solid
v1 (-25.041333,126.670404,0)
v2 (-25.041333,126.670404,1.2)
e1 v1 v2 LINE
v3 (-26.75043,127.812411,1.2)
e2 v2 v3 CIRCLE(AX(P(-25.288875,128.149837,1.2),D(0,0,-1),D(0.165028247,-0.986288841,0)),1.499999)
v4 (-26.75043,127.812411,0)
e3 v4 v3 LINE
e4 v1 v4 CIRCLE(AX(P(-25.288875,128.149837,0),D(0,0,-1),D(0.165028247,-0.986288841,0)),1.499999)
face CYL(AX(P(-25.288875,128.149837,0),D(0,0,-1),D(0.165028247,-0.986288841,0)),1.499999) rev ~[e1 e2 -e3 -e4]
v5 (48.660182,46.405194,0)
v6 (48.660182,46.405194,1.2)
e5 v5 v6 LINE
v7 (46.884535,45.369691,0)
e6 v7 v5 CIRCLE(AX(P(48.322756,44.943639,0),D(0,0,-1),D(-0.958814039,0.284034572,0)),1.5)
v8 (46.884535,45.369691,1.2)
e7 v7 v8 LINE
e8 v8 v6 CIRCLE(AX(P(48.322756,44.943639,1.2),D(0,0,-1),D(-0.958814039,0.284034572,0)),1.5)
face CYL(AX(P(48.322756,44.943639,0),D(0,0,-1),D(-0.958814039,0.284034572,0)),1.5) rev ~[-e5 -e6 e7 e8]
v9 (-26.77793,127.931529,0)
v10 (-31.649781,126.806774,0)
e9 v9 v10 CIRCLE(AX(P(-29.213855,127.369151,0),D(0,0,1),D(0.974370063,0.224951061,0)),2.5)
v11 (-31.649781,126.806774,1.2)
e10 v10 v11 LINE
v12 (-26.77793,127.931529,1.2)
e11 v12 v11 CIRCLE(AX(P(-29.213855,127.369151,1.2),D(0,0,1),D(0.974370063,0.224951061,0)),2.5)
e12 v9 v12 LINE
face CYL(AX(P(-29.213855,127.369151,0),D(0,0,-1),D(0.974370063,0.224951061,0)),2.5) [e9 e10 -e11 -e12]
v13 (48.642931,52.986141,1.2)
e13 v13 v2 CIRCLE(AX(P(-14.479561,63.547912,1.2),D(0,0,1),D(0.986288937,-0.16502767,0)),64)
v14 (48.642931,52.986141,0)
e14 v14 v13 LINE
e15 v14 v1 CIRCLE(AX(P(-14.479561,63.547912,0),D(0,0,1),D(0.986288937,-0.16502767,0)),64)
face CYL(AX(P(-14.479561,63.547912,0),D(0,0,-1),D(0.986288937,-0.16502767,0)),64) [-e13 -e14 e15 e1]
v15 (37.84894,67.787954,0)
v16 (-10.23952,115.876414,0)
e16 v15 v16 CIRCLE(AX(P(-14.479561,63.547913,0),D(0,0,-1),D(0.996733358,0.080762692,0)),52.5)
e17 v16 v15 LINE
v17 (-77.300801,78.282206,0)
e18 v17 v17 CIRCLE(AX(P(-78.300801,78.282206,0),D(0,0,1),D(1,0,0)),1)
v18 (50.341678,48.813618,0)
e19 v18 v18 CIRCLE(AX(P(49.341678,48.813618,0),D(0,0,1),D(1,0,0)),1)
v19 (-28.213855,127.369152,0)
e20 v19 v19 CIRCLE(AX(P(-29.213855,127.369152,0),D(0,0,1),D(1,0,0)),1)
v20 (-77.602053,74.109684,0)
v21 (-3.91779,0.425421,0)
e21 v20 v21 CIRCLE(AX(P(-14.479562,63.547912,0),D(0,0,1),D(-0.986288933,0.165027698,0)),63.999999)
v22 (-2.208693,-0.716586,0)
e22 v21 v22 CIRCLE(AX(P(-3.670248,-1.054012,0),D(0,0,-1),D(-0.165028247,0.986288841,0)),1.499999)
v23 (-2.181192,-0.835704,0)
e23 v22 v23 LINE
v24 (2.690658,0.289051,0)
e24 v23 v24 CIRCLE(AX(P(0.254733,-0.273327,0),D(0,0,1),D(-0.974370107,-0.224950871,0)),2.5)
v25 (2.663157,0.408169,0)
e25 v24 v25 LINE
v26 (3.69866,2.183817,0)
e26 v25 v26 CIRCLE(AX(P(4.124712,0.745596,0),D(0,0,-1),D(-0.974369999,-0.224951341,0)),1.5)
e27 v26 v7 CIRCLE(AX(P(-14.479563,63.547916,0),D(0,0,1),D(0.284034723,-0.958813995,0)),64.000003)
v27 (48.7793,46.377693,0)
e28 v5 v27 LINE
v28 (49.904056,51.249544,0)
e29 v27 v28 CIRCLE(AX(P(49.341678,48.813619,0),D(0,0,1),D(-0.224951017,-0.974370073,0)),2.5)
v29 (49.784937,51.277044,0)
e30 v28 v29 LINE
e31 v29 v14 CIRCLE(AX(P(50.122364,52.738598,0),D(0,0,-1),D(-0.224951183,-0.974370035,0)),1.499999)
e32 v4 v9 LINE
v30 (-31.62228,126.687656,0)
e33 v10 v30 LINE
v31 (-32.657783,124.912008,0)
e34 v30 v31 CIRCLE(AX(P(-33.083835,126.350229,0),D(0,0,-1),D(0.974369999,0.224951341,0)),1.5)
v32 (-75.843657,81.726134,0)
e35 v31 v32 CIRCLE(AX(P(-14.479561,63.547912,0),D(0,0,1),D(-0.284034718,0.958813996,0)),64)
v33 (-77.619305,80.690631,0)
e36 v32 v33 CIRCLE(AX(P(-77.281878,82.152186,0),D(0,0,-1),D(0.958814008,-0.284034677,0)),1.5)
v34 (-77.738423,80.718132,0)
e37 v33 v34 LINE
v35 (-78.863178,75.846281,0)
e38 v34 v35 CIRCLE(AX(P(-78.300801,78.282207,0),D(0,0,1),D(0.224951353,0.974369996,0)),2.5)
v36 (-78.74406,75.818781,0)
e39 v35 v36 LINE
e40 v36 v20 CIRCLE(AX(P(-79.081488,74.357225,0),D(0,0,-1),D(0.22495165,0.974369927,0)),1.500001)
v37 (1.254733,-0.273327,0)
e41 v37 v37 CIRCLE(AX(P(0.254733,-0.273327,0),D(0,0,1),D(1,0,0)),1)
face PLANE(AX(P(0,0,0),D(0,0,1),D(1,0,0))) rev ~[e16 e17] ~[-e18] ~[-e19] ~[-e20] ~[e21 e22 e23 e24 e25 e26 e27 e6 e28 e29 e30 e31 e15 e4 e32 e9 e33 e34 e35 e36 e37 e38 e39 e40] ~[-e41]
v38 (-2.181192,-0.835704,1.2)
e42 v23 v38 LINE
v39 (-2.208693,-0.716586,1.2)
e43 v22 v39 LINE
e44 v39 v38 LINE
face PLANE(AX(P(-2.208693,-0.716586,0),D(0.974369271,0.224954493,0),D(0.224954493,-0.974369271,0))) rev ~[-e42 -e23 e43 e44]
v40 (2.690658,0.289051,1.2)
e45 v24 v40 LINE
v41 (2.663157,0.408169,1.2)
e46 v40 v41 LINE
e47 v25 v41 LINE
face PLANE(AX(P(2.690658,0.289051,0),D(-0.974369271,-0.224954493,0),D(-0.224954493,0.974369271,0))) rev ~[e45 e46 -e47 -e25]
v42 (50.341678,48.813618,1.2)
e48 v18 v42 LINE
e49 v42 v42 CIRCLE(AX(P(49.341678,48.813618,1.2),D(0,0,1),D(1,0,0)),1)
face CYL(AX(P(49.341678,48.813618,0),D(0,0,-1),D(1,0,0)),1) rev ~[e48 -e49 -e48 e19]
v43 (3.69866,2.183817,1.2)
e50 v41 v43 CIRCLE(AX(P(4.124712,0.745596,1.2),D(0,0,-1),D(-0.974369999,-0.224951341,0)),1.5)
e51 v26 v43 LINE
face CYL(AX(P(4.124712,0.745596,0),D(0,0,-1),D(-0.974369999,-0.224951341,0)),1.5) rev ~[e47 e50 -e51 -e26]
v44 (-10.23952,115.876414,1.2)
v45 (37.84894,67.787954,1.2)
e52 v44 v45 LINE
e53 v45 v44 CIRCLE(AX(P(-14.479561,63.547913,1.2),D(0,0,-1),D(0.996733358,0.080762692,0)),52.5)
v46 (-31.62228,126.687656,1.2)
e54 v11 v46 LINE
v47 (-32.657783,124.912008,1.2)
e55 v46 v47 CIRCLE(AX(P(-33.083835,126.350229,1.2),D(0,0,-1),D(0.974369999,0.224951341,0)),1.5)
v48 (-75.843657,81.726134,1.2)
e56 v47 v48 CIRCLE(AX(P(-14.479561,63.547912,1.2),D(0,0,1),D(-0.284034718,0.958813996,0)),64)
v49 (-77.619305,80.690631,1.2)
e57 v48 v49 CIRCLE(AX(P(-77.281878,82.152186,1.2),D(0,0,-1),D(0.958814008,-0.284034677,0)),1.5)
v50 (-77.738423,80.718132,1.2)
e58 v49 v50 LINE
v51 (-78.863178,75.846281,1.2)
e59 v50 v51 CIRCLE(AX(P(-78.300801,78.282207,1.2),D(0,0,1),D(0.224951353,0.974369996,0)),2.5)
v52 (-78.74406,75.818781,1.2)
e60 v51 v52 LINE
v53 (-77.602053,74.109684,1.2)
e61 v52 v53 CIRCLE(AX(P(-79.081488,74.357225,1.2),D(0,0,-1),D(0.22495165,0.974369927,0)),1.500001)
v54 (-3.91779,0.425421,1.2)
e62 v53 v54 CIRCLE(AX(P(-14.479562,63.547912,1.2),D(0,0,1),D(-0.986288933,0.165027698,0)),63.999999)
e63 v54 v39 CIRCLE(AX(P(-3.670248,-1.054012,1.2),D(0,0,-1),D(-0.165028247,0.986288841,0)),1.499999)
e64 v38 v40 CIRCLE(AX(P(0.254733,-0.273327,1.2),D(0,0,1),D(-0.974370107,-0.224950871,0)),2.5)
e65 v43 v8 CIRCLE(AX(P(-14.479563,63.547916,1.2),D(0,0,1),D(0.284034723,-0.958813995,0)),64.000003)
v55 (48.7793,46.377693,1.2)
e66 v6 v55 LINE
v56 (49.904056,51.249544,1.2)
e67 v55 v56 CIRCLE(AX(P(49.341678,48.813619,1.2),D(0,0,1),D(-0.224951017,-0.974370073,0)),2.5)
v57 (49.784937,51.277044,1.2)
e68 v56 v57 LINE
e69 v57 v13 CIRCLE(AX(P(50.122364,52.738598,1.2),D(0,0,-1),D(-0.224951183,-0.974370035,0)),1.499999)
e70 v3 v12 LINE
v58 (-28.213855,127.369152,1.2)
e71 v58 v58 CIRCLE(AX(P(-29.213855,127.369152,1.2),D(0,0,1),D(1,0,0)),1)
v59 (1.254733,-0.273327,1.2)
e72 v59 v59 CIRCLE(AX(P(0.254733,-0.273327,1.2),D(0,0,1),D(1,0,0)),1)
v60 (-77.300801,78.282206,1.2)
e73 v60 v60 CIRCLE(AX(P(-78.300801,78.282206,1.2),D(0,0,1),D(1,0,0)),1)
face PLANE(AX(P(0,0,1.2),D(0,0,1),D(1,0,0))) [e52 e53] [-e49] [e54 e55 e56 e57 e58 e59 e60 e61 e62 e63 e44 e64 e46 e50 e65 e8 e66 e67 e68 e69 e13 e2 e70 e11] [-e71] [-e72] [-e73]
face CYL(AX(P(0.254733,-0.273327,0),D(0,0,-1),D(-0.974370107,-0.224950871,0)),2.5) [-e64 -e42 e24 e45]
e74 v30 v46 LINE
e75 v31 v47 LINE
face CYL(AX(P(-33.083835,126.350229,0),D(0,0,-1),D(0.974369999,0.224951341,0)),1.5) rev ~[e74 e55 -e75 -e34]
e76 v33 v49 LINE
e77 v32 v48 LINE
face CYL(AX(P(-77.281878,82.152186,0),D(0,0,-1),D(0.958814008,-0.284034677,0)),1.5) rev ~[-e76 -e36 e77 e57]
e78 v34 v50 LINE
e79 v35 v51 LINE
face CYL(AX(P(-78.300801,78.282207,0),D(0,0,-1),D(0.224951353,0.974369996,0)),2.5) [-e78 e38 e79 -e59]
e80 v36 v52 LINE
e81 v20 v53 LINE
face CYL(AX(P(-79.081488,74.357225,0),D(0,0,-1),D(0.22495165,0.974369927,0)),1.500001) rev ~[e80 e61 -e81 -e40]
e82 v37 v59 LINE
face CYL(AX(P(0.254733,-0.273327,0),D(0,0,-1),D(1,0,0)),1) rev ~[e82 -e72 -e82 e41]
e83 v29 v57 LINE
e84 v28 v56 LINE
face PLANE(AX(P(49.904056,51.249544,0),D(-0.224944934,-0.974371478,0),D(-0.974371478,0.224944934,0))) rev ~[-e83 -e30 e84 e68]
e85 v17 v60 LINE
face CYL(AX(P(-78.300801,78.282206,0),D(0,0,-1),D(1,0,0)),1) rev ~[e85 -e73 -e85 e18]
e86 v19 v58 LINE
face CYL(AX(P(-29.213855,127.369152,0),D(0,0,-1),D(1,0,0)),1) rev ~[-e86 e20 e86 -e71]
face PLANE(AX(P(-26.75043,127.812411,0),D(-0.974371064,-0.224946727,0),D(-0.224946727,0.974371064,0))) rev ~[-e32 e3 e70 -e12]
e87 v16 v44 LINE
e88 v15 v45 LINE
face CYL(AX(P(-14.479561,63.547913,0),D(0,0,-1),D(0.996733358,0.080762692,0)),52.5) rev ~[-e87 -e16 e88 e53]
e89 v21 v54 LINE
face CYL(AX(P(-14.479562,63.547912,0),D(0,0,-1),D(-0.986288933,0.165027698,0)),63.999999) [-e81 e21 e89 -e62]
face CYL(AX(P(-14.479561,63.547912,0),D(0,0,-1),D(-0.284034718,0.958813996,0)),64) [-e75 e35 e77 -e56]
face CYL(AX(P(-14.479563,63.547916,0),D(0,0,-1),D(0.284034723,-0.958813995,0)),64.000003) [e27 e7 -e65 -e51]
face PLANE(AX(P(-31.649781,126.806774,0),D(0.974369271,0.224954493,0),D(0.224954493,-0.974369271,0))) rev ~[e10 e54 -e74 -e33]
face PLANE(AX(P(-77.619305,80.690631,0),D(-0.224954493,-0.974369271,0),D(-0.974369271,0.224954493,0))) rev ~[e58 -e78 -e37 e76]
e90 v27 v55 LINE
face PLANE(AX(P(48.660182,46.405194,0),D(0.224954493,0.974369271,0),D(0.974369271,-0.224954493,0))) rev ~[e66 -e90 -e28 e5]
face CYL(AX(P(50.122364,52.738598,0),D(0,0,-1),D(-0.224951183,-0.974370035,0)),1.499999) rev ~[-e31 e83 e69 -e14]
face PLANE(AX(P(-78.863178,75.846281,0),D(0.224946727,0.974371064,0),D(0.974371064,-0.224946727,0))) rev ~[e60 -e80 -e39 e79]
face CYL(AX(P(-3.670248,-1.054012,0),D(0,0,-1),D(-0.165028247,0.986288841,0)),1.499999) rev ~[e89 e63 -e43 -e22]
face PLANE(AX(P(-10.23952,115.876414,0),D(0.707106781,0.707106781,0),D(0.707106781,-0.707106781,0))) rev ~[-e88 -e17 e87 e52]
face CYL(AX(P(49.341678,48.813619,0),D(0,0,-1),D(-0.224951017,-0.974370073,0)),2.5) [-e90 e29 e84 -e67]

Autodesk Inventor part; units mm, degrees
ref_plane "YZ Plane" through (0, 0, 0) normal (1, 0, 0) x (0, 1, 0)
ref_plane "XZ Plane" through (0, 0, 0) normal (0, 1, 0) x (-1, 0, 0)
ref_plane "作業平面1" through (0, 0, 0) normal (0, 0, 1) x (1, 0, 0)
sketch "スケッチ1" plane through (0, 0, 0) normal (0, 0, 1) x (1, 0, 0)
  circle A0 centre (-14.624772, 63.539385) radius 64
  arc A1 (-81.893775, 52.547912) -> (-80.479561, 53.962126) centre (-81.186668, 53.255019) ccw
  line L0 (-81.893775, 52.547912) -> (-83.065348, 52.547912)
  arc A2 (-84.479561, 53.962126) -> (-83.065348, 52.547912) centre (-83.772455, 53.255019) ccw
  line L1 (-84.479561, 53.962126) -> (-84.479561, 73.133699)
  arc A3 (-83.065348, 74.547912) -> (-84.479561, 73.133699) centre (-83.772455, 73.840806) ccw
  line L2 (-83.065348, 74.547912) -> (-81.893775, 74.547912)
  arc A4 (-80.479561, 73.133699) -> (-81.893775, 74.547912) centre (-81.186668, 73.840806) ccw
  line L3 (-80.479561, 73.133699) -> (-80.479561, 53.962126)
  arc A5 (-3.479561, 132.133699) -> (-4.893775, 133.547912) centre (-4.186668, 132.840806) ccw
  line L4 (-3.479561, 132.133699) -> (-3.479561, 130.962126)
  arc A6 (-4.893775, 129.547912) -> (-3.479561, 130.962126) centre (-4.186668, 130.255019) ccw
  line L5 (-4.893775, 129.547912) -> (-24.065348, 129.547912)
  arc A7 (-25.479561, 130.962126) -> (-24.065348, 129.547912) centre (-24.772455, 130.255019) ccw
  line L6 (-25.479561, 130.962126) -> (-25.479561, 132.133699)
  arc A8 (-24.065348, 133.547912) -> (-25.479561, 132.133699) centre (-24.772455, 132.840806) ccw
  line L7 (-24.065348, 133.547912) -> (-4.893775, 133.547912)
  arc A9 (54.106225, 52.547912) -> (55.520439, 53.962126) centre (54.813332, 53.255019) ccw
  line L8 (54.106225, 52.547912) -> (52.934652, 52.547912)
  arc A10 (51.520439, 53.962126) -> (52.934652, 52.547912) centre (52.227545, 53.255019) ccw
  line L9 (51.520439, 53.962126) -> (51.520439, 73.133699)
  arc A11 (52.934652, 74.547912) -> (51.520439, 73.133699) centre (52.227545, 73.840806) ccw
  line L10 (52.934652, 74.547912) -> (54.106225, 74.547912)
  arc A12 (55.520439, 73.133699) -> (54.106225, 74.547912) centre (54.813332, 73.840806) ccw
  line L11 (55.520439, 73.133699) -> (55.520439, 53.962126)
  arc A13 (-25.479561, -5.037874) -> (-24.065348, -6.452088) centre (-24.772455, -5.744981) ccw
  line L12 (-25.479561, -5.037874) -> (-25.479561, -3.866301)
  arc A14 (-24.065348, -2.452088) -> (-25.479561, -3.866301) centre (-24.772455, -3.159194) ccw
  line L13 (-24.065348, -2.452088) -> (-4.893775, -2.452088)
  arc A15 (-3.479561, -3.866301) -> (-4.893775, -2.452088) centre (-4.186668, -3.159194) ccw
  line L14 (-3.479561, -3.866301) -> (-3.479561, -5.037874)
  arc A16 (-4.893775, -6.452088) -> (-3.479561, -5.037874) centre (-4.186668, -5.744981) ccw
  line L15 (-4.893775, -6.452088) -> (-24.065348, -6.452088)
  arc A17 (-90.380937, 104.093949) -> (-92.776199, 103.718007) centre (-91.441598, 103.033289) ccw
  arc A18 (-92.776199, 103.718007) -> (-98.248191, 90.50745) centre (-14.479561, 63.547912) ccw
  arc A19 (-98.248191, 90.50745) -> (-96.820317, 88.547912) centre (-96.820317, 90.047912) ccw
  line L16 (-96.820317, 88.547912) -> (-88.479561, 88.547912)
  arc A20 (-86.479561, 86.547912) -> (-88.479561, 88.547912) centre (-88.479561, 86.547912) ccw
  line L17 (-86.479561, 86.547912) -> (-86.479561, 40.547912)
  arc A21 (-88.479561, 38.547912) -> (-86.479561, 40.547912) centre (-88.479561, 40.547912) ccw
  line L18 (-88.479561, 38.547912) -> (-96.820317, 38.547912)
  arc A22 (-96.820317, 38.547912) -> (-98.248191, 36.588375) centre (-96.820317, 37.047912) ccw
  arc A23 (-98.248191, 36.588375) -> (-41.439099, -20.220717) centre (-14.479561, 63.547912) ccw
  arc A24 (-41.439099, -20.220717) -> (-39.479561, -18.792843) centre (-40.979561, -18.792843) ccw
  line L19 (-39.479561, -18.792843) -> (-39.479561, -10.452088)
  arc A25 (-37.479561, -8.452088) -> (-39.479561, -10.452088) centre (-37.479561, -10.452088) ccw
  line L20 (-37.479561, -8.452088) -> (8.520439, -8.452088)
  arc A26 (10.520439, -10.452088) -> (8.520439, -8.452088) centre (8.520439, -10.452088) ccw
  line L21 (10.520439, -10.452088) -> (10.520439, -18.792843)
  arc A27 (10.520439, -18.792843) -> (12.479976, -20.220717) centre (12.020439, -18.792843) ccw
  arc A28 (12.479976, -20.220717) -> (25.690533, -14.748726) centre (-14.479561, 63.547912) ccw
  arc A29 (25.690533, -14.748726) -> (26.066476, -12.353464) centre (25.005815, -13.414124) ccw
  line L22 (26.066476, -12.353464) -> (20.079693, -6.366681)
  arc A30 (20.079693, -2.124041) -> (20.079693, -6.366681) centre (22.201014, -4.245361) ccw
  line L23 (25.736548, 3.532814) -> (45.535537, 23.331803)
  arc A31 (55.435032, 28.988658) -> (51.192392, 28.988658) centre (53.313712, 26.867337) ccw
  line L24 (55.435032, 28.988658) -> (61.421815, 23.001875)
  arc A32 (61.421815, 23.001875) -> (63.817077, 23.377818) centre (62.482475, 24.062536) ccw
  arc A33 (63.817077, 23.377818) -> (69.289068, 36.588375) centre (-14.479561, 63.547912) ccw
  arc A34 (69.289068, 36.588375) -> (67.861194, 38.547912) centre (67.861194, 37.047912) ccw
  line L25 (67.861194, 38.547912) -> (59.520439, 38.547912)
  arc A35 (57.520439, 40.547912) -> (59.520439, 38.547912) centre (59.520439, 40.547912) ccw
  line L26 (57.520439, 40.547912) -> (57.520439, 86.547912)
  arc A36 (59.520439, 88.547912) -> (57.520439, 86.547912) centre (59.520439, 86.547912) ccw
  line L27 (59.520439, 88.547912) -> (67.861194, 88.547912)
  arc A37 (67.861194, 88.547912) -> (69.289068, 90.50745) centre (67.861194, 90.047912) ccw
  arc A38 (69.289068, 90.50745) -> (12.479976, 147.316542) centre (-14.479561, 63.547912) ccw
  arc A39 (12.479976, 147.316542) -> (10.520439, 145.888668) centre (12.020439, 145.888668) ccw
  line L28 (10.520439, 145.888668) -> (10.520439, 137.547912)
  arc A40 (8.520439, 135.547912) -> (10.520439, 137.547912) centre (8.520439, 137.547912) ccw
  line L29 (8.520439, 135.547912) -> (-37.479561, 135.547912)
  arc A41 (-39.479561, 137.547912) -> (-37.479561, 135.547912) centre (-37.479561, 137.547912) ccw
  line L30 (-39.479561, 137.547912) -> (-39.479561, 145.888668)
  arc A42 (-39.479561, 145.888668) -> (-41.439099, 147.316542) centre (-40.979561, 145.888668) ccw
  arc A43 (-41.439099, 147.316542) -> (-54.649656, 141.84455) centre (-14.479561, 63.547912) ccw
  arc A44 (-54.649656, 141.84455) -> (-55.025598, 139.449288) centre (-53.964938, 140.509949) ccw
  line L31 (-55.025598, 139.449288) -> (-49.038816, 133.462506)
  arc A45 (-49.038816, 129.219865) -> (-49.038816, 133.462506) centre (-51.160136, 131.341186) ccw
  line L32 (-49.038816, 129.219865) -> (-51.160136, 127.098545)
  arc A46 (-84.394155, 98.107167) -> (-80.151514, 98.107167) centre (-82.272835, 100.228487) ccw
  line L33 (-84.394155, 98.107167) -> (-90.380937, 104.093949)
  arc A47 (-32.657783, 124.912008) -> (-31.62228, 126.687656) centre (-33.083835, 126.350229) ccw
  line L34 (-31.62228, 126.687656) -> (-31.649781, 126.806774)
  arc A48 (-26.77793, 127.931529) -> (-31.649781, 126.806774) centre (-29.213855, 127.369152) ccw
  line L35 (-26.77793, 127.931529) -> (-26.75043, 127.812411)
  arc A49 (-26.75043, 127.812411) -> (-25.041333, 126.670404) centre (-25.288875, 128.149838) ccw
  arc A50 (48.642931, 52.986141) -> (-25.041333, 126.670404) centre (-14.479561, 63.547912) ccw
  arc A51 (48.642931, 52.986141) -> (49.784937, 51.277044) centre (50.122364, 52.738599) ccw
  line L36 (49.784937, 51.277044) -> (49.904056, 51.249544)
  arc A52 (48.7793, 46.377693) -> (49.904056, 51.249544) centre (49.341678, 48.813618) ccw
  line L37 (48.7793, 46.377693) -> (48.660182, 46.405194)
  arc A53 (48.660182, 46.405194) -> (46.884535, 45.369691) centre (48.322756, 44.943639) ccw
  arc A54 (3.69866, 2.183817) -> (46.884535, 45.369691) centre (-14.479561, 63.547912) ccw
  arc A55 (3.69866, 2.183817) -> (2.663157, 0.408169) centre (4.124712, 0.745596) ccw
  line L38 (2.663157, 0.408169) -> (2.690658, 0.289051)
  arc A56 (-2.181192, -0.835704) -> (2.690658, 0.289051) centre (0.254733, -0.273327) ccw
  line L39 (-2.181192, -0.835704) -> (-2.208693, -0.716586)
  arc A57 (-2.208693, -0.716586) -> (-3.91779, 0.425421) centre (-3.670248, -1.054013) ccw
  arc A58 (-77.602053, 74.109684) -> (-3.91779, 0.425421) centre (-14.479561, 63.547912) ccw
  arc A59 (-77.602053, 74.109684) -> (-78.74406, 75.818781) centre (-79.081487, 74.357226) ccw
  line L40 (-78.74406, 75.818781) -> (-78.863178, 75.846281)
  arc A60 (-77.738423, 80.718132) -> (-78.863178, 75.846281) centre (-78.300801, 78.282206) ccw
  line L41 (-77.738423, 80.718132) -> (-77.619305, 80.690631)
  arc A61 (-77.619305, 80.690631) -> (-75.843657, 81.726134) centre (-77.281878, 82.152186) ccw
  arc A62 (-32.657783, 124.912008) -> (-75.843657, 81.726134) centre (-14.479561, 63.547912) ccw
  circle A63 centre (65.069166, 92.047912) radius 2.5
  circle A64 centre (-42.979561, -16.000815) radius 2.5
  circle A65 centre (14.020439, 143.09664) radius 2.5
  circle A66 centre (-94.028289, 35.047912) radius 2.5
  circle A67 centre (49.341678, 48.813618) radius 1
  circle A68 centre (0.254733, -0.273327) radius 1
  circle A69 centre (-78.300801, 78.282206) radius 1
  circle A70 centre (-29.213855, 127.369152) radius 1
  circle A71 centre (-14.479561, 63.547912) radius 52.5
  circle A72 centre (19.135053, 141.074087) radius 2
  circle A73 centre (63.046613, 97.162527) radius 2
  circle A74 centre (2.020439, 127.968406) radius 2
  circle A75 centre (49.940932, 80.047912) radius 2
  line L42 (-74.49466, 103.056915) -> (-72.019786, 100.582041)
  line L43 (-71.31268, 99.874934) -> (-74.141107, 97.046507)
  line L44 (-74.848214, 97.753614) -> (-77.323087, 100.228487)
  line L45 (-54.69567, 123.563011) -> (-74.49466, 103.764021)
  line L46 (-51.160136, 126.391438) -> (-48.685263, 123.916565)
  line L47 (-47.978156, 123.209458) -> (-50.806583, 120.381031)
  line L48 (-51.51369, 121.088137) -> (-53.988563, 123.563011)
  arc A76 (-47.978156, 123.209458) -> (-48.685263, 123.916565) centre (-48.331709, 123.563011) ccw
  arc A77 (-51.51369, 121.088137) -> (-50.806583, 120.381031) centre (-51.160136, 120.734584) ccw
  arc A78 (-71.31268, 99.874934) -> (-72.019786, 100.582041) centre (-71.666233, 100.228487) ccw
  arc A79 (-74.848214, 97.753614) -> (-74.141107, 97.046507) centre (-74.49466, 97.40006) ccw
  line L49 (-78.030194, 100.228487) -> (-80.151514, 98.107167)
  line L50 (22.201014, 0.704386) -> (19.72614, 3.17926)
  arc A80 (19.019033, 3.886367) -> (19.72614, 3.17926) centre (19.372587, 3.532814) ccw
  line L51 (19.019033, 3.886367) -> (21.84746, 6.714794)
  arc A81 (22.554567, 6.007687) -> (21.84746, 6.714794) centre (22.201014, 6.361241) ccw
  line L52 (22.554567, 6.007687) -> (25.029441, 3.532814)
  line L53 (49.071071, 26.867337) -> (51.192392, 28.988658)
  line L54 (45.535537, 24.03891) -> (43.060664, 26.513784)
  arc A82 (42.353557, 27.220891) -> (43.060664, 26.513784) centre (42.70711, 26.867337) ccw
  line L55 (42.353557, 27.220891) -> (45.181984, 30.049318)
  arc A83 (45.889091, 29.342211) -> (45.181984, 30.049318) centre (45.535537, 29.695765) ccw
  line L56 (45.889091, 29.342211) -> (48.363965, 26.867337)
  line L57 (20.079693, -2.124041) -> (22.201014, -0.00272)
  arc A84 (22.201014, -0.00272) -> (22.201014, 0.704386) centre (21.84746, 0.350833) ccw
  arc A85 (25.029441, 3.532814) -> (25.736548, 3.532814) centre (25.382994, 3.886367) ccw
  arc A86 (45.535537, 23.331803) -> (45.535537, 24.03891) centre (45.181984, 23.685357) ccw
  arc A87 (48.363965, 26.867337) -> (49.071071, 26.867337) centre (48.717518, 27.220891) ccw
  arc A88 (-51.160136, 127.098545) -> (-51.160136, 126.391438) centre (-50.806583, 126.744992) ccw
  arc A89 (-53.988563, 123.563011) -> (-54.69567, 123.563011) centre (-54.342117, 123.209458) ccw
  arc A90 (-74.49466, 103.764021) -> (-74.49466, 103.056915) centre (-74.141107, 103.410468) ccw
  arc A91 (-77.323087, 100.228487) -> (-78.030194, 100.228487) centre (-77.676641, 99.874934) ccw
  arc A92 (30.422034, 111.235402) -> (31.814662, 111.256349) centre (31.107555, 111.963456) ccw
  arc A93 (30.422034, 111.235402) -> (5.557839, 125.907776) centre (-14.479561, 63.547912) ccw
  arc A94 (4.902925, 127.136978) -> (5.557839, 125.907776) centre (5.863754, 126.859835) ccw
  arc A95 (4.902925, 127.136978) -> (2.020439, 130.968406) centre (2.020439, 127.968406) ccw
  line L58 (2.020439, 130.968406) -> (-0.686668, 130.968406)
  arc A96 (-1.686668, 131.968406) -> (-0.686668, 130.968406) centre (-0.686668, 131.968406) ccw
  line L59 (-1.686668, 131.968406) -> (-1.686668, 133.047912)
  arc A97 (-0.686668, 134.047912) -> (-1.686668, 133.047912) centre (-0.686668, 133.047912) ccw
  line L60 (-0.686668, 134.047912) -> (11.020439, 134.047912)
  arc A98 (11.020439, 134.047912) -> (12.020439, 135.047912) centre (11.020439, 135.047912) ccw
  line L61 (12.020439, 135.047912) -> (12.020439, 138.179207)
  arc A99 (13.302114, 139.138717) -> (12.020439, 138.179207) centre (13.020439, 138.179207) ccw
  line L62 (13.302114, 139.138717) -> (18.14919, 137.715802)
  arc A100 (18.14919, 137.715802) -> (22.557489, 140.341331) centre (19.135053, 141.074087) ccw
  arc A101 (23.979947, 141.027692) -> (22.557489, 140.341331) centre (23.535328, 140.131972) ccw
  arc A102 (45.237685, 126.126667) -> (23.979947, 141.027692) centre (-14.479561, 63.547912) ccw
  arc A103 (45.254419, 124.696106) -> (45.237685, 126.126667) centre (44.547312, 125.403213) ccw
  line L63 (45.254419, 124.696106) -> (31.814662, 111.256349)
  arc A104 (55.020439, 76.340806) -> (56.020439, 77.340806) centre (55.020439, 77.340806) ccw
  line L64 (55.020439, 76.340806) -> (53.940932, 76.340806)
  arc A105 (52.940932, 77.340806) -> (53.940932, 76.340806) centre (53.940932, 77.340806) ccw
  line L65 (52.940932, 77.340806) -> (52.940932, 80.047912)
  arc A106 (52.940932, 80.047912) -> (49.109504, 82.930399) centre (49.940932, 80.047912) ccw
  arc A107 (47.880302, 83.585313) -> (49.109504, 82.930399) centre (48.832361, 83.891227) ccw
  arc A108 (47.880302, 83.585313) -> (33.207929, 108.449508) centre (-14.479561, 63.547912) ccw
  arc A109 (33.228875, 109.842135) -> (33.207929, 108.449508) centre (33.935982, 109.135029) ccw
  line L66 (33.228875, 109.842135) -> (46.668632, 123.281893)
  arc A110 (48.099193, 123.265159) -> (46.668632, 123.281893) centre (47.375739, 122.574786) ccw
  arc A111 (63.000218, 102.00742) -> (48.099193, 123.265159) centre (-14.479561, 63.547912) ccw
  arc A112 (62.313857, 100.584963) -> (63.000218, 102.00742) centre (62.104498, 101.562802) ccw
  arc A113 (62.313857, 100.584963) -> (59.688329, 96.176664) centre (63.046613, 97.162527) ccw
  line L67 (59.688329, 96.176664) -> (61.111243, 91.329587)
  arc A114 (60.151733, 90.047912) -> (61.111243, 91.329587) centre (60.151733, 91.047912) ccw
  line L68 (60.151733, 90.047912) -> (57.020439, 90.047912)
  arc A115 (57.020439, 90.047912) -> (56.020439, 89.047912) centre (57.020439, 89.047912) ccw
  line L69 (56.020439, 89.047912) -> (56.020439, 77.340806)
  arc A116 (54.874372, 32.670638) -> (54.874372, 31.670638) centre (54.874372, 32.170638) ccw
  line L70 (54.874372, 32.670638) -> (56.702799, 34.499065)
  arc A117 (57.702799, 34.499065) -> (56.702799, 34.499065) centre (57.202799, 34.499065) ccw
  line L71 (57.702799, 34.499065) -> (62.359654, 29.842211)
  arc A118 (62.359654, 28.842211) -> (62.359654, 29.842211) centre (62.359654, 29.342211) ccw
  line L72 (62.359654, 28.842211) -> (60.531226, 27.013784)
  arc A119 (59.531226, 27.013784) -> (60.531226, 27.013784) centre (60.031226, 27.013784) ccw
  line L73 (59.531226, 27.013784) -> (54.874372, 31.670638)
  arc A120 (-86.661922, 92.596759) -> (-85.661922, 92.596759) centre (-86.161922, 92.596759) ccw
  line L74 (-86.661922, 92.596759) -> (-91.318776, 97.253614)
  arc A121 (-91.318776, 98.253614) -> (-91.318776, 97.253614) centre (-91.318776, 97.753614) ccw
  line L75 (-91.318776, 98.253614) -> (-89.490349, 100.082041)
  arc A122 (-88.490349, 100.082041) -> (-89.490349, 100.082041) centre (-88.990349, 100.082041) ccw
  line L76 (-88.490349, 100.082041) -> (-83.833495, 95.425187)
  arc A123 (-83.833495, 94.425187) -> (-83.833495, 95.425187) centre (-83.833495, 94.925187) ccw
  line L77 (-83.833495, 94.425187) -> (-85.661922, 92.596759)
  line L78 (19.22614, -13.291303) -> (14.569286, -8.634448)
  arc A124 (14.569286, -7.634448) -> (14.569286, -8.634448) centre (14.569286, -8.134448) ccw
  line L79 (14.569286, -7.634448) -> (16.397713, -5.806021)
  arc A125 (17.397713, -5.806021) -> (16.397713, -5.806021) centre (16.897713, -5.806021) ccw
  line L80 (17.397713, -5.806021) -> (22.054567, -10.462875)
  arc A126 (22.054567, -11.462875) -> (22.054567, -10.462875) centre (22.054567, -10.962875) ccw
  line L81 (22.054567, -11.462875) -> (20.22614, -13.291303)
  arc A127 (19.22614, -13.291303) -> (20.22614, -13.291303) centre (19.72614, -13.291303) ccw
  line L82 (-48.185263, 140.387127) -> (-43.528408, 135.730273)
  arc A128 (-43.528408, 134.730273) -> (-43.528408, 135.730273) centre (-43.528408, 135.230273) ccw
  line L83 (-43.528408, 134.730273) -> (-45.356835, 132.901846)
  arc A129 (-46.356835, 132.901846) -> (-45.356835, 132.901846) centre (-45.856835, 132.901846) ccw
  line L84 (-46.356835, 132.901846) -> (-51.01369, 137.5587)
  arc A130 (-51.01369, 138.5587) -> (-51.01369, 137.5587) centre (-51.01369, 138.0587) ccw
  line L85 (-51.01369, 138.5587) -> (-49.185263, 140.387127)
  arc A131 (-48.185263, 140.387127) -> (-49.185263, 140.387127) centre (-48.685263, 140.387127) ccw
  arc A132 (-1.686668, -5.952088) -> (-0.686668, -6.952088) centre (-0.686668, -5.952088) ccw
  line L86 (-1.686668, -5.952088) -> (-1.686668, -5.183904)
  arc A133 (-0.498388, -4.201788) -> (-1.686668, -5.183904) centre (-0.686668, -5.183904) ccw
  arc A134 (-0.498388, -4.201788) -> (4.246848, -0.022298) centre (0.254733, -0.273327) ccw
  arc A135 (4.948269, 0.995459) -> (4.246848, -0.022298) centre (5.244877, 0.04046) ccw
  arc A136 (4.948269, 0.995459) -> (14.374317, 4.74567) centre (-14.479561, 63.547912) ccw
  arc A137 (15.521941, 4.555032) -> (14.374317, 4.74567) centre (14.814834, 3.847926) ccw
  line L87 (15.521941, 4.555032) -> (19.372587, 0.704386)
  arc A138 (19.372587, -0.709827) -> (19.372587, 0.704386) centre (18.66548, -0.00272) ccw
  line L88 (19.372587, -0.709827) -> (13.423219, -6.659194)
  arc A139 (12.716112, -6.952088) -> (13.423219, -6.659194) centre (12.716112, -5.952088) ccw
  line L89 (12.716112, -6.952088) -> (-0.686668, -6.952088)
  arc A140 (-96.383203, 91.36955) -> (-95.43634, 90.047912) centre (-95.43634, 91.047912) ccw
  arc A141 (-94.512296, 96.365763) -> (-96.383203, 91.36955) centre (-14.479561, 63.547912) ccw
  arc A142 (-92.879956, 96.693473) -> (-94.512296, 96.365763) centre (-93.587062, 95.986366) ccw
  line L90 (-92.879956, 96.693473) -> (-87.941502, 91.755019)
  arc A143 (-88.648609, 90.047912) -> (-87.941502, 91.755019) centre (-88.648609, 91.047912) ccw
  line L91 (-88.648609, 90.047912) -> (-95.43634, 90.047912)
  arc A144 (-47.297412, 143.580647) -> (-47.625122, 141.948307) centre (-46.918015, 142.655414) ccw
  arc A145 (-42.301199, 145.451554) -> (-47.297412, 143.580647) centre (-14.479561, 63.547912) ccw
  arc A146 (-40.979561, 144.504691) -> (-42.301199, 145.451554) centre (-41.979561, 144.504691) ccw
  line L92 (-40.979561, 144.504691) -> (-40.979561, 137.71696)
  arc A147 (-42.686668, 137.009853) -> (-40.979561, 137.71696) centre (-41.979561, 137.71696) ccw
  line L93 (-42.686668, 137.009853) -> (-47.625122, 141.948307)
  arc A148 (67.42408, 35.726275) -> (66.477217, 37.047912) centre (66.477217, 36.047912) ccw
  arc A149 (65.553174, 30.730062) -> (67.42408, 35.726275) centre (-14.479561, 63.547912) ccw
  arc A150 (63.920833, 30.402352) -> (65.553174, 30.730062) centre (64.62794, 31.109459) ccw
  line L94 (63.920833, 30.402352) -> (58.982379, 35.340806)
  arc A151 (59.689486, 37.047912) -> (58.982379, 35.340806) centre (59.689486, 36.047912) ccw
  line L95 (59.689486, 37.047912) -> (66.477217, 37.047912)
  arc A152 (18.338289, -16.484823) -> (18.665999, -14.852482) centre (17.958892, -15.559589) ccw
  arc A153 (13.342076, -18.355729) -> (18.338289, -16.484823) centre (-14.479561, 63.547912) ccw
  arc A154 (12.020439, -17.408866) -> (13.342076, -18.355729) centre (13.020439, -17.408866) ccw
  line L96 (12.020439, -17.408866) -> (12.020439, -10.621135)
  arc A155 (13.727545, -9.914028) -> (12.020439, -10.621135) centre (13.020439, -10.621135) ccw
  line L97 (13.727545, -9.914028) -> (18.665999, -14.852482)
  arc A156 (-77.323087, 97.40006) -> (-78.737301, 97.40006) centre (-78.030194, 96.692954) ccw
  line L98 (-77.323087, 97.40006) -> (-73.472441, 93.549414)
  arc A157 (-73.281804, 92.40179) -> (-73.472441, 93.549414) centre (-74.179548, 92.842308) ccw
  arc A158 (-73.281804, 92.40179) -> (-77.032015, 82.975742) centre (-14.479561, 63.547912) ccw
  arc A159 (-78.049771, 82.274322) -> (-77.032015, 82.975742) centre (-77.987014, 83.272351) ccw
  arc A160 (-78.049771, 82.274322) -> (-82.229262, 77.529086) centre (-78.300801, 78.282206) ccw
  arc A161 (-83.211377, 76.340806) -> (-82.229262, 77.529086) centre (-83.211377, 77.340806) ccw
  line L99 (-83.211377, 76.340806) -> (-83.979561, 76.340806)
  arc A162 (-84.979561, 77.340806) -> (-83.979561, 76.340806) centre (-83.979561, 77.340806) ccw
  line L100 (-84.979561, 77.340806) -> (-84.979561, 90.743586)
  arc A163 (-84.686668, 91.450693) -> (-84.979561, 90.743586) centre (-83.979561, 90.743586) ccw
  line L101 (-84.686668, 91.450693) -> (-78.737301, 97.40006)
  arc A164 (-27.272455, 133.047912) -> (-28.272455, 134.047912) centre (-28.272455, 133.047912) ccw
  line L102 (-27.272455, 133.047912) -> (-27.272455, 132.279728)
  arc A165 (-28.460735, 131.297613) -> (-27.272455, 132.279728) centre (-28.272455, 132.279728) ccw
  arc A166 (-28.460735, 131.297613) -> (-33.205971, 127.118122) centre (-29.213855, 127.369152) ccw
  arc A167 (-33.907391, 126.100366) -> (-33.205971, 127.118122) centre (-34.203999, 127.055365) ccw
  arc A168 (-33.907391, 126.100366) -> (-43.333439, 122.350155) centre (-14.479561, 63.547912) ccw
  arc A169 (-44.481063, 122.540792) -> (-43.333439, 122.350155) centre (-43.773956, 123.247899) ccw
  line L103 (-44.481063, 122.540792) -> (-48.331709, 126.391438)
  arc A170 (-48.331709, 127.805652) -> (-48.331709, 126.391438) centre (-47.624602, 127.098545) ccw
  line L104 (-48.331709, 127.805652) -> (-42.382342, 133.755019)
  arc A171 (-41.675235, 134.047912) -> (-42.382342, 133.755019) centre (-41.675235, 133.047912) ccw
  line L105 (-41.675235, 134.047912) -> (-28.272455, 134.047912)
  line L106 (55.727545, 35.645132) -> (49.778178, 29.695765)
  arc A172 (48.363965, 29.695765) -> (49.778178, 29.695765) centre (49.071071, 30.402871) ccw
  line L107 (48.363965, 29.695765) -> (44.513319, 33.54641)
  arc A173 (44.322681, 34.694034) -> (44.513319, 33.54641) centre (45.220425, 34.253517) ccw
  arc A174 (44.322681, 34.694034) -> (48.072892, 44.120082) centre (-14.479561, 63.547912) ccw
  arc A175 (49.090649, 44.821503) -> (48.072892, 44.120082) centre (49.027891, 43.823474) ccw
  arc A176 (49.090649, 44.821503) -> (53.270139, 49.566739) centre (49.341678, 48.813618) ccw
  arc A177 (54.252255, 50.755019) -> (53.270139, 49.566739) centre (54.252255, 49.755019) ccw
  line L108 (54.252255, 50.755019) -> (55.020439, 50.755019)
  arc A178 (56.020439, 49.755019) -> (55.020439, 50.755019) centre (55.020439, 49.755019) ccw
  line L109 (56.020439, 49.755019) -> (56.020439, 36.352239)
  arc A179 (55.727545, 35.645132) -> (56.020439, 36.352239) centre (55.020439, 36.352239) ccw
  arc A180 (-77.058316, 3.830666) -> (-75.627755, 3.813932) centre (-76.334862, 4.521039) ccw
  arc A181 (-91.959341, 25.088404) -> (-77.058316, 3.830666) centre (-14.479561, 63.547912) ccw
  arc A182 (-91.27298, 26.510862) -> (-91.959341, 25.088404) centre (-91.063621, 25.533023) ccw
  arc A183 (-91.27298, 26.510862) -> (-88.647451, 30.919161) centre (-92.005736, 29.933298) ccw
  line L110 (-88.647451, 30.919161) -> (-90.070366, 35.766237)
  arc A184 (-89.110856, 37.047912) -> (-90.070366, 35.766237) centre (-89.110856, 36.047912) ccw
  line L111 (-89.110856, 37.047912) -> (-85.979561, 37.047912)
  arc A185 (-85.979561, 37.047912) -> (-84.979561, 38.047912) centre (-85.979561, 38.047912) ccw
  line L112 (-84.979561, 38.047912) -> (-84.979561, 49.755019)
  arc A186 (-83.979561, 50.755019) -> (-84.979561, 49.755019) centre (-83.979561, 49.755019) ccw
  line L113 (-83.979561, 50.755019) -> (-82.900055, 50.755019)
  arc A187 (-81.900055, 49.755019) -> (-82.900055, 50.755019) centre (-82.900055, 49.755019) ccw
  line L114 (-81.900055, 49.755019) -> (-81.900055, 47.047912)
  arc A188 (-81.900055, 47.047912) -> (-78.068627, 44.165426) centre (-78.900055, 47.047912) ccw
  arc A189 (-76.839425, 43.510512) -> (-78.068627, 44.165426) centre (-77.791484, 43.204597) ccw
  arc A190 (-76.839425, 43.510512) -> (-62.167051, 18.646317) centre (-14.479561, 63.547912) ccw
  arc A191 (-62.187998, 17.253689) -> (-62.167051, 18.646317) centre (-62.895105, 17.960796) ccw
  line L115 (-62.187998, 17.253689) -> (-75.627755, 3.813932)
  arc A192 (-33.862048, -0.041153) -> (-30.979561, -3.872581) centre (-30.979561, -0.872581) ccw
  line L116 (-30.979561, -3.872581) -> (-28.272455, -3.872581)
  arc A193 (-27.272455, -4.872581) -> (-28.272455, -3.872581) centre (-28.272455, -4.872581) ccw
  line L117 (-27.272455, -4.872581) -> (-27.272455, -5.952088)
  arc A194 (-28.272455, -6.952088) -> (-27.272455, -5.952088) centre (-28.272455, -5.952088) ccw
  line L118 (-28.272455, -6.952088) -> (-39.979561, -6.952088)
  arc A195 (-39.979561, -6.952088) -> (-40.979561, -7.952088) centre (-39.979561, -7.952088) ccw
  line L119 (-40.979561, -7.952088) -> (-40.979561, -11.083382)
  arc A196 (-42.261236, -12.042892) -> (-40.979561, -11.083382) centre (-41.979561, -11.083382) ccw
  line L120 (-42.261236, -12.042892) -> (-47.108313, -10.619977)
  arc A197 (-47.108313, -10.619977) -> (-51.516612, -13.245506) centre (-48.094176, -13.978262) ccw
  arc A198 (-52.939069, -13.931867) -> (-51.516612, -13.245506) centre (-52.494451, -13.036147) ccw
  arc A199 (-74.196808, 0.969158) -> (-52.939069, -13.931867) centre (-14.479561, 63.547912) ccw
  arc A200 (-74.213542, 2.399719) -> (-74.196808, 0.969158) centre (-73.506435, 1.692612) ccw
  line L121 (-74.213542, 2.399719) -> (-60.773784, 15.839476)
  arc A201 (-59.381157, 15.860422) -> (-60.773784, 15.839476) centre (-60.066678, 15.132369) ccw
  arc A202 (-59.381157, 15.860422) -> (-34.516962, 1.188049) centre (-14.479561, 63.547912) ccw
  arc A203 (-33.862048, -0.041153) -> (-34.516962, 1.188049) centre (-34.822876, 0.23599) ccw
  line L122 (-10.23952, 115.876414) -> (37.84894, 67.787954)
  line L123 (-64.595165, 113.663516) -> (35.636043, 13.432309) construction
  point P0 (0, 0)
  point P1 (30.775273, 108.802746)
  dimension "d0" = 2
  dimension "d3" = 105
  dimension "d4" = 24
sketch "スケッチ1 outline for 押し出し1" plane through (0, 0, 0) normal (0, 0, 1) x (1, 0, 0)
  line L0 (-78.863178, 75.846281) -> (-78.74406, 75.818781)
  arc A0 (-78.74406, 75.818781) -> (-77.602053, 74.109684) centre (-79.081487, 74.357226) cw
  arc A1 (-77.602053, 74.109684) -> (-3.91779, 0.425421) centre (-14.479561, 63.547912) ccw
  arc A2 (-3.91779, 0.425421) -> (-2.208693, -0.716586) centre (-3.670248, -1.054013) cw
  line L1 (-2.208693, -0.716586) -> (-2.181192, -0.835704)
  arc A3 (-2.181192, -0.835704) -> (2.690658, 0.289051) centre (0.254733, -0.273327) ccw
  line L2 (2.690658, 0.289051) -> (2.663157, 0.408169)
  arc A4 (2.663157, 0.408169) -> (3.69866, 2.183817) centre (4.124712, 0.745596) cw
  arc A5 (3.69866, 2.183817) -> (46.884535, 45.369691) centre (-14.479561, 63.547912) ccw
  arc A6 (46.884535, 45.369691) -> (48.660182, 46.405194) centre (48.322756, 44.943639) cw
  line L3 (48.660182, 46.405194) -> (48.7793, 46.377693)
  arc A7 (48.7793, 46.377693) -> (49.904056, 51.249544) centre (49.341678, 48.813618) ccw
  line L4 (49.904056, 51.249544) -> (49.784937, 51.277044)
  arc A8 (49.784937, 51.277044) -> (48.642931, 52.986141) centre (50.122364, 52.738599) cw
  arc A9 (48.642931, 52.986141) -> (-25.041333, 126.670404) centre (-14.479561, 63.547912) ccw
  arc A10 (-25.041333, 126.670404) -> (-26.75043, 127.812411) centre (-25.288875, 128.149838) cw
  line L5 (-26.75043, 127.812411) -> (-26.77793, 127.931529)
  arc A11 (-26.77793, 127.931529) -> (-31.649781, 126.806774) centre (-29.213855, 127.369152) ccw
  line L6 (-31.649781, 126.806774) -> (-31.62228, 126.687656)
  arc A12 (-31.62228, 126.687656) -> (-32.657783, 124.912008) centre (-33.083835, 126.350229) cw
  arc A13 (-32.657783, 124.912008) -> (-75.843657, 81.726134) centre (-14.479561, 63.547912) ccw
  arc A14 (-75.843657, 81.726134) -> (-77.619305, 80.690631) centre (-77.281878, 82.152186) cw
  line L7 (-77.619305, 80.690631) -> (-77.738423, 80.718132)
  arc A15 (-77.738423, 80.718132) -> (-78.863178, 75.846281) centre (-78.300801, 78.282206) ccw
  circle A16 centre (0.254733, -0.273327) radius 1
  arc A17 (37.84894, 67.787954) -> (-10.23952, 115.876414) centre (-14.479561, 63.547912) cw
  line L8 (-10.23952, 115.876414) -> (37.84894, 67.787954)
  circle A18 centre (49.341678, 48.813618) radius 1
  circle A19 centre (-78.300801, 78.282206) radius 1
  circle A20 centre (-29.213855, 127.369152) radius 1
extrude "押し出し1" add sketch "スケッチ1 outline for 押し出し1" along normal blind 1.2
properties part number "LineSensor"
